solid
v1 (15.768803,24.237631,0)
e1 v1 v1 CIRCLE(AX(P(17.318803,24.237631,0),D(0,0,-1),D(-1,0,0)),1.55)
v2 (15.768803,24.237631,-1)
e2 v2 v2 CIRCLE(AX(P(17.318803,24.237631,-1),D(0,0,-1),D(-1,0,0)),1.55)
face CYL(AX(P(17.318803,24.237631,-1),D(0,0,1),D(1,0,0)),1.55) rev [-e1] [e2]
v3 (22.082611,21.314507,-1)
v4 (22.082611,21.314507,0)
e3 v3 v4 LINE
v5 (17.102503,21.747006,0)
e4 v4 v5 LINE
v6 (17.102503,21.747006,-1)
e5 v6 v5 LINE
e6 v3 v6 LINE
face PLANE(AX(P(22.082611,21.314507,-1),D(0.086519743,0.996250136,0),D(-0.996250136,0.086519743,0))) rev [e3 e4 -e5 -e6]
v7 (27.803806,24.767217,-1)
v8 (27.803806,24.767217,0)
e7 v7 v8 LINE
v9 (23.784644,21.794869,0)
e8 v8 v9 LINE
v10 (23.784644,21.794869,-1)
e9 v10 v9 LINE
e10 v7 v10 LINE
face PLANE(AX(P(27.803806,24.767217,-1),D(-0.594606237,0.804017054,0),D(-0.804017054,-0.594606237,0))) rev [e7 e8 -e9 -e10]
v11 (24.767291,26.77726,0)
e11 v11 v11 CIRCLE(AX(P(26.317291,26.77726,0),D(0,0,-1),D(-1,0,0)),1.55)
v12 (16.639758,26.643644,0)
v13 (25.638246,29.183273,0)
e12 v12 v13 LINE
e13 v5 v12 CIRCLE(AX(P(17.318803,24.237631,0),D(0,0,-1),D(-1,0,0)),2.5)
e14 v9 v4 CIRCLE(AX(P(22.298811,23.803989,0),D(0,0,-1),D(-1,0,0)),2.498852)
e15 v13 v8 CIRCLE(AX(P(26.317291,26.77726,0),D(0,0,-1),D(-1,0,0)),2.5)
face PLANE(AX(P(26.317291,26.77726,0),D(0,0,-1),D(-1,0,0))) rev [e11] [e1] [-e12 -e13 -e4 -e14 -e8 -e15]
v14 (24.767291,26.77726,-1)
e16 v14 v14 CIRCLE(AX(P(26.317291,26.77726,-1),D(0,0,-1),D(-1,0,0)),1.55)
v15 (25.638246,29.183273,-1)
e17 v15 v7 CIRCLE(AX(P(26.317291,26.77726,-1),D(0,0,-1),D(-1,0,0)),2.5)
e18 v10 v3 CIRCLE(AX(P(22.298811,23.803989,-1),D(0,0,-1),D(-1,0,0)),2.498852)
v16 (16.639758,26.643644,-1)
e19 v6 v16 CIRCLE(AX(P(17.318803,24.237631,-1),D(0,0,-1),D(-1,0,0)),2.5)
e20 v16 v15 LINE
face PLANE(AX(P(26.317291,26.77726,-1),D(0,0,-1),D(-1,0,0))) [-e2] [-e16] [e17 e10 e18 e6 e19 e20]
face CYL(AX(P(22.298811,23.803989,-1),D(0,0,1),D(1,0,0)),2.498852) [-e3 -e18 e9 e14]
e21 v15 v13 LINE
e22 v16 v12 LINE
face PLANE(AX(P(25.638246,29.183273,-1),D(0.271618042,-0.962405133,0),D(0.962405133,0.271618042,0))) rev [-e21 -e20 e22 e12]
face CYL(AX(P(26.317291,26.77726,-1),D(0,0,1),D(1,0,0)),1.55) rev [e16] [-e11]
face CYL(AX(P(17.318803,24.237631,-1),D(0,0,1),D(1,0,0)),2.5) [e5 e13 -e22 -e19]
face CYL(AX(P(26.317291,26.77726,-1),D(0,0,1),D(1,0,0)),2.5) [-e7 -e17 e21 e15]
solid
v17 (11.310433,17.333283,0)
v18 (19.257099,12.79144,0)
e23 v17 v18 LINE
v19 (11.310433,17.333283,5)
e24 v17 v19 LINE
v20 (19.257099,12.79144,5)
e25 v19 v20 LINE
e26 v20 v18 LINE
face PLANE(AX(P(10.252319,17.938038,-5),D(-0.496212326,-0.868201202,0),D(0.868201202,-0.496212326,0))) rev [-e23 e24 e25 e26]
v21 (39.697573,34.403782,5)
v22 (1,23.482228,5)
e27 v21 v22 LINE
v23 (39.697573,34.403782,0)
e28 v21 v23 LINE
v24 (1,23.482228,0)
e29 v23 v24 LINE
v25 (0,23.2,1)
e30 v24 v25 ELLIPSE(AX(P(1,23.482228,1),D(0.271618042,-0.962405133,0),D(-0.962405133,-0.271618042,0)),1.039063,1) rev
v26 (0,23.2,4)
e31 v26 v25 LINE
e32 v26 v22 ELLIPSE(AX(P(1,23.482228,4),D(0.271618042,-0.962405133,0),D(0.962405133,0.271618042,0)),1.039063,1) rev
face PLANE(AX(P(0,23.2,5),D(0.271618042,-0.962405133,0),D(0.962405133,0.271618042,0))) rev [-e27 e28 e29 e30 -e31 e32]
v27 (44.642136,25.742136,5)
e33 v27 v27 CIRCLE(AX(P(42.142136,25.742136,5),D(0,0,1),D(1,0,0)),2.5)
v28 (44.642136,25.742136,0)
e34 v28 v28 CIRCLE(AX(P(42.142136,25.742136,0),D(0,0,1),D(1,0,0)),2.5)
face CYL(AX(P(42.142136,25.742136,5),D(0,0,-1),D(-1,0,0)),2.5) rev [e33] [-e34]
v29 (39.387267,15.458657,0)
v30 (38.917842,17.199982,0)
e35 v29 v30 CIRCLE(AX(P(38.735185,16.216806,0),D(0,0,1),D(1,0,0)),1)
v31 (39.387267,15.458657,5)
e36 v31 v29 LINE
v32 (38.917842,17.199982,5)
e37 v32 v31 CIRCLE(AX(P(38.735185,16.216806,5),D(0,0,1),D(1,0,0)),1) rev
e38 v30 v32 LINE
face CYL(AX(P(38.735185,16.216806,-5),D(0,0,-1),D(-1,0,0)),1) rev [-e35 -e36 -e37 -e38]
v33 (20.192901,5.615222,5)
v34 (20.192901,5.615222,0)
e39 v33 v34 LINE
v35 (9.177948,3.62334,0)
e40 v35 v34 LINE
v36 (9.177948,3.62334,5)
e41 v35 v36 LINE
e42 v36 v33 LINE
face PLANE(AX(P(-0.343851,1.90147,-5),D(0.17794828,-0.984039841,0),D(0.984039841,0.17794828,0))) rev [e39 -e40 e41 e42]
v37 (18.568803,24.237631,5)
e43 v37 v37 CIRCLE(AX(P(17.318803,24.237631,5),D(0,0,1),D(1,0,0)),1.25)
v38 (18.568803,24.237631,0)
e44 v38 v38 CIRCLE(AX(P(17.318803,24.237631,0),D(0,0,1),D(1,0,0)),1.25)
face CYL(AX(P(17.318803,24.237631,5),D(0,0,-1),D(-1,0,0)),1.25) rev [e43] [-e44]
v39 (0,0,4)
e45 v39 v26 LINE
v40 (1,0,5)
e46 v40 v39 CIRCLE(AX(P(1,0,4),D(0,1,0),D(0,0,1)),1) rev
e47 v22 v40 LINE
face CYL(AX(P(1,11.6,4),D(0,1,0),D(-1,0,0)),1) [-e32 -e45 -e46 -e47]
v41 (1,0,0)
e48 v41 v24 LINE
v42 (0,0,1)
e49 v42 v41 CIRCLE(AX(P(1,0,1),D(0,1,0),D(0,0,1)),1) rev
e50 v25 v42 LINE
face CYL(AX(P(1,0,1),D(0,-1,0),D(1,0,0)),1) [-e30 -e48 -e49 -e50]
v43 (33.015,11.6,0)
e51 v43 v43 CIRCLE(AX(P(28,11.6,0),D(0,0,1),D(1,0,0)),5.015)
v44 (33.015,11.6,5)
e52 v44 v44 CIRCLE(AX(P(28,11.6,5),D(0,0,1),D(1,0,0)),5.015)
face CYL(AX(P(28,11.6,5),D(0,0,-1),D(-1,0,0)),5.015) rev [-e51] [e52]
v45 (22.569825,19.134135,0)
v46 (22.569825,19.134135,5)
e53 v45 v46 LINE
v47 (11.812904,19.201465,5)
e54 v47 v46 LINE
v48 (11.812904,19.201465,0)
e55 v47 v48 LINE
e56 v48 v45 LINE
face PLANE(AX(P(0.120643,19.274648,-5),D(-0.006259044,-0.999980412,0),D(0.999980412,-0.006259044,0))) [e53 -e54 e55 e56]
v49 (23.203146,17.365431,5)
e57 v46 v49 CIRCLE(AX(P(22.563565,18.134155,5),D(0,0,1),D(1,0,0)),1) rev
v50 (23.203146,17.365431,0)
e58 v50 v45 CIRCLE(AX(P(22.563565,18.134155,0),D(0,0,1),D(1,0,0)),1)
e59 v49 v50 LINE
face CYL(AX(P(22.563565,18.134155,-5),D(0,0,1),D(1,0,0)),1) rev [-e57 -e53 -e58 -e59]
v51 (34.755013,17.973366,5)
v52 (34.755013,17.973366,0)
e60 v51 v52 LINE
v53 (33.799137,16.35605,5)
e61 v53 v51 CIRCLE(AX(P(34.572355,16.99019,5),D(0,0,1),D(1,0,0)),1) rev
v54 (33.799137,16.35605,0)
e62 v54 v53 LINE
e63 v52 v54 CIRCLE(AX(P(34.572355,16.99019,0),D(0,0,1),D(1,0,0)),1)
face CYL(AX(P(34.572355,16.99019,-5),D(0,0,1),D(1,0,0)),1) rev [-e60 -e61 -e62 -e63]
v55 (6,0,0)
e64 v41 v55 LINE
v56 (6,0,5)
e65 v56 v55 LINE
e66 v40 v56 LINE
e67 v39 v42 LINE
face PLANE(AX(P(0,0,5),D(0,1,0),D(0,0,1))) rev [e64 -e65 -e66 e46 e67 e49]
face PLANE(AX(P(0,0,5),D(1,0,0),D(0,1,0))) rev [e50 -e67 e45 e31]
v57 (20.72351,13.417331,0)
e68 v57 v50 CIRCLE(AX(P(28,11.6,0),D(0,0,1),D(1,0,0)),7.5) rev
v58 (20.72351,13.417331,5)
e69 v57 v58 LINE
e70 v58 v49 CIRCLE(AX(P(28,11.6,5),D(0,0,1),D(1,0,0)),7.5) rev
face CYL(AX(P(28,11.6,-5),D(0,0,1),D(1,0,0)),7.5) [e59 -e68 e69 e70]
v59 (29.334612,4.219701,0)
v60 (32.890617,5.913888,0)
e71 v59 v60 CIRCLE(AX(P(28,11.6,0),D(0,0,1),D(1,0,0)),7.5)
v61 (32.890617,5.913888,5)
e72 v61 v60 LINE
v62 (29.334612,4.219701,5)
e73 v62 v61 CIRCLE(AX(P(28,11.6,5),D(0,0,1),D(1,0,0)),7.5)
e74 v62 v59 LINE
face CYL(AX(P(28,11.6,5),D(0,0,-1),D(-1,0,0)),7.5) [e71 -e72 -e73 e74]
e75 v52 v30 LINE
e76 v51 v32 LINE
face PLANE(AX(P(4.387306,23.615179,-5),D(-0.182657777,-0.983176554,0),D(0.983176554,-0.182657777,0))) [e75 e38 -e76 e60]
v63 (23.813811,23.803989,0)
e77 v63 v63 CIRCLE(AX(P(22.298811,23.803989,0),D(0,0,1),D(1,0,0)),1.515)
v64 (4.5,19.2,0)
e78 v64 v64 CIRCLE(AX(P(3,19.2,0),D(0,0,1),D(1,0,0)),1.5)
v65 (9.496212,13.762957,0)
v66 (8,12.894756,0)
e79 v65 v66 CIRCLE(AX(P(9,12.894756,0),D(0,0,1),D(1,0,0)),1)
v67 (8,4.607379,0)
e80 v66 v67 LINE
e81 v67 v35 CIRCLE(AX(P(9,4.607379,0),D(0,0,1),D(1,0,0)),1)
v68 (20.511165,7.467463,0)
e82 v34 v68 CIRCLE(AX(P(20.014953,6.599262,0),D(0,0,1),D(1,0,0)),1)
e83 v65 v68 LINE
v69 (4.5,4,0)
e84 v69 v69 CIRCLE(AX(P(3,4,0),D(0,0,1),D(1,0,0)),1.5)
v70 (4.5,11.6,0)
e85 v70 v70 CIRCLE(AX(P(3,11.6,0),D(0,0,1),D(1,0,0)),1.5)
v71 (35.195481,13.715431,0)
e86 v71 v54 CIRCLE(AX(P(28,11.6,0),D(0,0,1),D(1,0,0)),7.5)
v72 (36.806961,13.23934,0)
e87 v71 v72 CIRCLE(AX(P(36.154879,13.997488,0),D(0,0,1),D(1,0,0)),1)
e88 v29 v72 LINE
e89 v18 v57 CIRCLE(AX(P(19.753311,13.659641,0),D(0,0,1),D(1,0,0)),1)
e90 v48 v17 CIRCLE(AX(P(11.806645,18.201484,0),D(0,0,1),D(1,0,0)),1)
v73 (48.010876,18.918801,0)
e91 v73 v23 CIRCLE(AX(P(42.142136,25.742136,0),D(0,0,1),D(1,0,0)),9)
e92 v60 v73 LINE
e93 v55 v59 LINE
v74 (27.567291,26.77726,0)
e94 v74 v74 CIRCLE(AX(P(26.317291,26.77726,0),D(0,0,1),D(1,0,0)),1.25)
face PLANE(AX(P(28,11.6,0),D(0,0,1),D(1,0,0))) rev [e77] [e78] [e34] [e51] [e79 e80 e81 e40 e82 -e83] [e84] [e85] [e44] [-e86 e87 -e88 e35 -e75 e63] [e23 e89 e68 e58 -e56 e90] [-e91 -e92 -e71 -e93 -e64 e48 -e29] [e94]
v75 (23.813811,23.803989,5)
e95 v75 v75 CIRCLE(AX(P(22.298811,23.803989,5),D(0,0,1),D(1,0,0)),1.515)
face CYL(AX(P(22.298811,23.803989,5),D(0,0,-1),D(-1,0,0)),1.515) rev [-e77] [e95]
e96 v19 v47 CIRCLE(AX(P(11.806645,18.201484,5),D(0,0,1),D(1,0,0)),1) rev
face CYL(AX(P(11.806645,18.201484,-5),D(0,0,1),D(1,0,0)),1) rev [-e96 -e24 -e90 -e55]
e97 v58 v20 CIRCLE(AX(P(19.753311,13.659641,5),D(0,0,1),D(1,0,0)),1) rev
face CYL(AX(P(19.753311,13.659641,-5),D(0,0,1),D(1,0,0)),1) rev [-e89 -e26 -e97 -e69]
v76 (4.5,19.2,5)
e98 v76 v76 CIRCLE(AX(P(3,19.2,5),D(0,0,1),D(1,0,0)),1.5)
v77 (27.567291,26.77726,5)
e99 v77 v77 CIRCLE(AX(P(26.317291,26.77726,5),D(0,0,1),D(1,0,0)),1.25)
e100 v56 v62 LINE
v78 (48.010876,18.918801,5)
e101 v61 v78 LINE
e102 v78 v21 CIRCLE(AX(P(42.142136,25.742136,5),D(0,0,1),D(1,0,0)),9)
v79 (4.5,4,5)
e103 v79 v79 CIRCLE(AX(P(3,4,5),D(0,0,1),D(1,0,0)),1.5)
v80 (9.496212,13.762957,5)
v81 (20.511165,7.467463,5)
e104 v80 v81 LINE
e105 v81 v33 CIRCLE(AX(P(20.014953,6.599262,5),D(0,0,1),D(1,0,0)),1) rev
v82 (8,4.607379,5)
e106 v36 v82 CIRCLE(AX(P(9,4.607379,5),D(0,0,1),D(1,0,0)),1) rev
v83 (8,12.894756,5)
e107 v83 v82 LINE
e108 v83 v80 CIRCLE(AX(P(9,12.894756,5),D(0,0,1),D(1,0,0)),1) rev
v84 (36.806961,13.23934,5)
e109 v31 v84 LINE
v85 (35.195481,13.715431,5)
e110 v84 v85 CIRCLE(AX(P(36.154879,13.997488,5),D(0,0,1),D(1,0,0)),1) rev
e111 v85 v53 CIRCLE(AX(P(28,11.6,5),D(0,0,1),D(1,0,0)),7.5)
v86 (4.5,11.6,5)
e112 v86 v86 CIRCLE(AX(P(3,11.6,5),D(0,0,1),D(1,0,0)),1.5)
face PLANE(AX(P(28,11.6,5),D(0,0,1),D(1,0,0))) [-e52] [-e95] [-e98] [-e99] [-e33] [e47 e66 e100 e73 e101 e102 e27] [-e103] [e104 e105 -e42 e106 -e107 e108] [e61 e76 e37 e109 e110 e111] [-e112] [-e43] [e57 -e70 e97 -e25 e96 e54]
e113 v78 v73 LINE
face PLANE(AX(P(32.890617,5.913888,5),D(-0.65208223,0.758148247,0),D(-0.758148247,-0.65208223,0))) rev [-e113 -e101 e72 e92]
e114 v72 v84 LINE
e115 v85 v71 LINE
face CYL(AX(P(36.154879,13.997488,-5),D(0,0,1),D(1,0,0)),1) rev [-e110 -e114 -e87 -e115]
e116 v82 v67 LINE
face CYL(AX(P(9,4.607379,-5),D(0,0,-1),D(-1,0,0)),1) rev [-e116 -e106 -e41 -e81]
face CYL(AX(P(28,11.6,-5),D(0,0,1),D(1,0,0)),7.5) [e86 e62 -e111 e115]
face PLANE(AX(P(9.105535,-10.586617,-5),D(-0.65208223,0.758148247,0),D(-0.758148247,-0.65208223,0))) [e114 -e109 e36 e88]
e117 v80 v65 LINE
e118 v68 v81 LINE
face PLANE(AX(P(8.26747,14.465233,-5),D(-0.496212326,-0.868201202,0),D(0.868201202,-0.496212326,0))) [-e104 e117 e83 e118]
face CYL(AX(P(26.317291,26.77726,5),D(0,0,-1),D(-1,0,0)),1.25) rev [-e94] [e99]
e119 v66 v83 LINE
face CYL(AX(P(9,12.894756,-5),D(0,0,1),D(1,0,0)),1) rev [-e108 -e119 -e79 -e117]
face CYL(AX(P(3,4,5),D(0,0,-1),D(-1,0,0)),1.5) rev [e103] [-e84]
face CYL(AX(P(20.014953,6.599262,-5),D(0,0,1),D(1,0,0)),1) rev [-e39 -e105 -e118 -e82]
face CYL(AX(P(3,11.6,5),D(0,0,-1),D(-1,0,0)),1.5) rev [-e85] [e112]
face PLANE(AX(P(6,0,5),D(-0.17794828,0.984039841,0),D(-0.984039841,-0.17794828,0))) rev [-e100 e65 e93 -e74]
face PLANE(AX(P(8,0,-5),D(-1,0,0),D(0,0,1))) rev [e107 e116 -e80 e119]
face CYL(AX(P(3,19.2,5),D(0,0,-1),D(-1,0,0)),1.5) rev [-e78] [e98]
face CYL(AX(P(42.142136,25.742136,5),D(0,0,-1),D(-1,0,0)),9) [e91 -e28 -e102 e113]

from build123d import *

# Parameters (mm, degrees)
SKETCH_1_R          = 1.5
SKETCH_1_R_2        = 5.015
SKETCH_1_R_3        = 2.5
SKETCH_1_R_4        = 1.515
SKETCH_1_R_5        = 1.25
EXTRUDE_1_DEPTH     = 5
FILLET_1_R          = 1
CUT_EXTRUDE_START   = -10
CUT_EXTRUDE_1_DEPTH = 10
FILLET_2_R          = 1
SKETCH_4_R          = 1.55
EXTRUDE_2_DEPTH     = 1


with BuildPart() as part:
    # 草图1 → 凸台-拉伸1 (new body)
    with BuildSketch(Plane.XY):
        with BuildLine():
            Line((0, 0), (0, 23.2))
            Line((0, 23.2), (39.697573244, 34.403781817))
            ThreePointArc((39.697573244, 34.403781817), (50.071662903, 29.999200004), (48.010875696, 18.918801397))
            Line((48.010875696, 18.918801397), (32.890616727, 5.913888145))
            ThreePointArc((32.890616727, 5.913888145), (31.225823282, 4.829175519), (29.3346121, 4.219701189))
            Line((29.3346121, 4.219701189), (6, 0))
            Line((6, 0), (0, 0))
        make_face()
        with Locations((3, 19.2)):
            Circle(SKETCH_1_R, mode=Mode.SUBTRACT)
        with Locations((3, 11.6)):
            Circle(SKETCH_1_R, mode=Mode.SUBTRACT)
        with Locations((3, 4)):
            Circle(SKETCH_1_R, mode=Mode.SUBTRACT)
        with Locations((28, 11.6)):
            Circle(SKETCH_1_R_2, mode=Mode.SUBTRACT)
        with Locations((42.142135624, 25.742135624)):
            Circle(SKETCH_1_R_3, mode=Mode.SUBTRACT)
        with Locations((22.298810634, 23.803988685)):
            Circle(SKETCH_1_R_4, mode=Mode.SUBTRACT)
        with Locations((17.318802705, 24.237631422)):
            Circle(SKETCH_1_R_5, mode=Mode.SUBTRACT)
        with Locations((26.317290694, 26.777260117)):
            Circle(SKETCH_1_R_5, mode=Mode.SUBTRACT)
    extrude(amount=EXTRUDE_1_DEPTH)

    # 圆角1
    fillet_1_edges = [part.edges().sort_by_distance(p)[0] for p in [
        (0, 11.6, 0),
        (0, 11.6, 5),
    ]]
    fillet(fillet_1_edges, radius=FILLET_1_R)

    # 草图3 → 切除-拉伸1 (cut)
    with BuildSketch(Plane.XY.offset(5).offset(CUT_EXTRUDE_START)):
        with BuildLine():
            Line((35.48325952, 12.100826268), (40.96881595, 16.818945558))
            Line((40.96881595, 16.818945558), (29.369933326, 18.973824156))
            ThreePointArc((29.369933326, 18.973824156), (33.603952256, 16.584548035), (35.48325952, 12.100826268))
        make_face()
        Polygon((8, 14.618103259), (8, 3.410325902), (22.896528211, 6.104131033), align=None)
        with BuildLine():
            Line((28.046942827, 19.09985309), (8, 19.225330237))
            Line((8, 19.225330237), (20.514901979, 12.072554345))
            ThreePointArc((20.514901979, 12.072554345), (22.883627253, 17.083860858), (28.046942827, 19.09985309))
        make_face()
    extrude(amount=CUT_EXTRUDE_1_DEPTH, mode=Mode.SUBTRACT)

    # 圆角2
    fillet_2_edges = [part.edges().sort_by_distance(p)[0] for p in [
        (22.896528211, 6.104131033, 2.5),
        (8, 3.410325902, 2.5),
        (29.369933326, 18.973824156, 2.5),
        (40.96881595, 16.818945558, 2.5),
        (35.48325952, 12.100826268, 2.5),
        (8, 14.618103259, 2.5),
        (20.514901979, 12.072554345, 2.5),
        (8, 19.225330237, 2.5),
    ]]
    fillet(fillet_2_edges, radius=FILLET_2_R)
    fillet_2_2_edges = [part.edges().sort_by_distance(p)[0] for p in [
        (28.046942827, 19.09985309, 2.5),
    ]]
    fillet(fillet_2_2_edges, radius=FILLET_2_R)


with BuildPart() as body_2:
    # 草图4 → 凸台-拉伸2 (new body)
    with BuildSketch(Plane(origin=(0, 0, 0), x_dir=(-1, 0, 0), z_dir=(0, 0, -1))):
        with BuildLine():
            Line((-27.803806286, 24.767217481), (-23.784643837, 21.794868765))
            ThreePointArc((-23.784643837, 21.794868765), (-22.977544022, 21.39908034), (-22.08261057, 21.314506672))
            Line((-22.08261057, 21.314506672), (-17.102503348, 21.747006081))
            ThreePointArc((-17.102503348, 21.747006081), (-14.829891944, 24.002422523), (-16.639757599, 26.643644253))
            Line((-16.639757599, 26.643644253), (-25.638245589, 29.183272948))
            ThreePointArc((-25.638245589, 29.183272948), (-28.561926214, 27.877992319), (-27.803806286, 24.767217481))
        make_face()
        with Locations((-26.317290694, 26.777260117)):
            Circle(SKETCH_4_R, mode=Mode.SUBTRACT)
        with Locations((-17.318802705, 24.237631422)):
            Circle(SKETCH_4_R, mode=Mode.SUBTRACT)
    extrude(amount=EXTRUDE_2_DEPTH)


solid = Compound([part.part, body_2.part])
